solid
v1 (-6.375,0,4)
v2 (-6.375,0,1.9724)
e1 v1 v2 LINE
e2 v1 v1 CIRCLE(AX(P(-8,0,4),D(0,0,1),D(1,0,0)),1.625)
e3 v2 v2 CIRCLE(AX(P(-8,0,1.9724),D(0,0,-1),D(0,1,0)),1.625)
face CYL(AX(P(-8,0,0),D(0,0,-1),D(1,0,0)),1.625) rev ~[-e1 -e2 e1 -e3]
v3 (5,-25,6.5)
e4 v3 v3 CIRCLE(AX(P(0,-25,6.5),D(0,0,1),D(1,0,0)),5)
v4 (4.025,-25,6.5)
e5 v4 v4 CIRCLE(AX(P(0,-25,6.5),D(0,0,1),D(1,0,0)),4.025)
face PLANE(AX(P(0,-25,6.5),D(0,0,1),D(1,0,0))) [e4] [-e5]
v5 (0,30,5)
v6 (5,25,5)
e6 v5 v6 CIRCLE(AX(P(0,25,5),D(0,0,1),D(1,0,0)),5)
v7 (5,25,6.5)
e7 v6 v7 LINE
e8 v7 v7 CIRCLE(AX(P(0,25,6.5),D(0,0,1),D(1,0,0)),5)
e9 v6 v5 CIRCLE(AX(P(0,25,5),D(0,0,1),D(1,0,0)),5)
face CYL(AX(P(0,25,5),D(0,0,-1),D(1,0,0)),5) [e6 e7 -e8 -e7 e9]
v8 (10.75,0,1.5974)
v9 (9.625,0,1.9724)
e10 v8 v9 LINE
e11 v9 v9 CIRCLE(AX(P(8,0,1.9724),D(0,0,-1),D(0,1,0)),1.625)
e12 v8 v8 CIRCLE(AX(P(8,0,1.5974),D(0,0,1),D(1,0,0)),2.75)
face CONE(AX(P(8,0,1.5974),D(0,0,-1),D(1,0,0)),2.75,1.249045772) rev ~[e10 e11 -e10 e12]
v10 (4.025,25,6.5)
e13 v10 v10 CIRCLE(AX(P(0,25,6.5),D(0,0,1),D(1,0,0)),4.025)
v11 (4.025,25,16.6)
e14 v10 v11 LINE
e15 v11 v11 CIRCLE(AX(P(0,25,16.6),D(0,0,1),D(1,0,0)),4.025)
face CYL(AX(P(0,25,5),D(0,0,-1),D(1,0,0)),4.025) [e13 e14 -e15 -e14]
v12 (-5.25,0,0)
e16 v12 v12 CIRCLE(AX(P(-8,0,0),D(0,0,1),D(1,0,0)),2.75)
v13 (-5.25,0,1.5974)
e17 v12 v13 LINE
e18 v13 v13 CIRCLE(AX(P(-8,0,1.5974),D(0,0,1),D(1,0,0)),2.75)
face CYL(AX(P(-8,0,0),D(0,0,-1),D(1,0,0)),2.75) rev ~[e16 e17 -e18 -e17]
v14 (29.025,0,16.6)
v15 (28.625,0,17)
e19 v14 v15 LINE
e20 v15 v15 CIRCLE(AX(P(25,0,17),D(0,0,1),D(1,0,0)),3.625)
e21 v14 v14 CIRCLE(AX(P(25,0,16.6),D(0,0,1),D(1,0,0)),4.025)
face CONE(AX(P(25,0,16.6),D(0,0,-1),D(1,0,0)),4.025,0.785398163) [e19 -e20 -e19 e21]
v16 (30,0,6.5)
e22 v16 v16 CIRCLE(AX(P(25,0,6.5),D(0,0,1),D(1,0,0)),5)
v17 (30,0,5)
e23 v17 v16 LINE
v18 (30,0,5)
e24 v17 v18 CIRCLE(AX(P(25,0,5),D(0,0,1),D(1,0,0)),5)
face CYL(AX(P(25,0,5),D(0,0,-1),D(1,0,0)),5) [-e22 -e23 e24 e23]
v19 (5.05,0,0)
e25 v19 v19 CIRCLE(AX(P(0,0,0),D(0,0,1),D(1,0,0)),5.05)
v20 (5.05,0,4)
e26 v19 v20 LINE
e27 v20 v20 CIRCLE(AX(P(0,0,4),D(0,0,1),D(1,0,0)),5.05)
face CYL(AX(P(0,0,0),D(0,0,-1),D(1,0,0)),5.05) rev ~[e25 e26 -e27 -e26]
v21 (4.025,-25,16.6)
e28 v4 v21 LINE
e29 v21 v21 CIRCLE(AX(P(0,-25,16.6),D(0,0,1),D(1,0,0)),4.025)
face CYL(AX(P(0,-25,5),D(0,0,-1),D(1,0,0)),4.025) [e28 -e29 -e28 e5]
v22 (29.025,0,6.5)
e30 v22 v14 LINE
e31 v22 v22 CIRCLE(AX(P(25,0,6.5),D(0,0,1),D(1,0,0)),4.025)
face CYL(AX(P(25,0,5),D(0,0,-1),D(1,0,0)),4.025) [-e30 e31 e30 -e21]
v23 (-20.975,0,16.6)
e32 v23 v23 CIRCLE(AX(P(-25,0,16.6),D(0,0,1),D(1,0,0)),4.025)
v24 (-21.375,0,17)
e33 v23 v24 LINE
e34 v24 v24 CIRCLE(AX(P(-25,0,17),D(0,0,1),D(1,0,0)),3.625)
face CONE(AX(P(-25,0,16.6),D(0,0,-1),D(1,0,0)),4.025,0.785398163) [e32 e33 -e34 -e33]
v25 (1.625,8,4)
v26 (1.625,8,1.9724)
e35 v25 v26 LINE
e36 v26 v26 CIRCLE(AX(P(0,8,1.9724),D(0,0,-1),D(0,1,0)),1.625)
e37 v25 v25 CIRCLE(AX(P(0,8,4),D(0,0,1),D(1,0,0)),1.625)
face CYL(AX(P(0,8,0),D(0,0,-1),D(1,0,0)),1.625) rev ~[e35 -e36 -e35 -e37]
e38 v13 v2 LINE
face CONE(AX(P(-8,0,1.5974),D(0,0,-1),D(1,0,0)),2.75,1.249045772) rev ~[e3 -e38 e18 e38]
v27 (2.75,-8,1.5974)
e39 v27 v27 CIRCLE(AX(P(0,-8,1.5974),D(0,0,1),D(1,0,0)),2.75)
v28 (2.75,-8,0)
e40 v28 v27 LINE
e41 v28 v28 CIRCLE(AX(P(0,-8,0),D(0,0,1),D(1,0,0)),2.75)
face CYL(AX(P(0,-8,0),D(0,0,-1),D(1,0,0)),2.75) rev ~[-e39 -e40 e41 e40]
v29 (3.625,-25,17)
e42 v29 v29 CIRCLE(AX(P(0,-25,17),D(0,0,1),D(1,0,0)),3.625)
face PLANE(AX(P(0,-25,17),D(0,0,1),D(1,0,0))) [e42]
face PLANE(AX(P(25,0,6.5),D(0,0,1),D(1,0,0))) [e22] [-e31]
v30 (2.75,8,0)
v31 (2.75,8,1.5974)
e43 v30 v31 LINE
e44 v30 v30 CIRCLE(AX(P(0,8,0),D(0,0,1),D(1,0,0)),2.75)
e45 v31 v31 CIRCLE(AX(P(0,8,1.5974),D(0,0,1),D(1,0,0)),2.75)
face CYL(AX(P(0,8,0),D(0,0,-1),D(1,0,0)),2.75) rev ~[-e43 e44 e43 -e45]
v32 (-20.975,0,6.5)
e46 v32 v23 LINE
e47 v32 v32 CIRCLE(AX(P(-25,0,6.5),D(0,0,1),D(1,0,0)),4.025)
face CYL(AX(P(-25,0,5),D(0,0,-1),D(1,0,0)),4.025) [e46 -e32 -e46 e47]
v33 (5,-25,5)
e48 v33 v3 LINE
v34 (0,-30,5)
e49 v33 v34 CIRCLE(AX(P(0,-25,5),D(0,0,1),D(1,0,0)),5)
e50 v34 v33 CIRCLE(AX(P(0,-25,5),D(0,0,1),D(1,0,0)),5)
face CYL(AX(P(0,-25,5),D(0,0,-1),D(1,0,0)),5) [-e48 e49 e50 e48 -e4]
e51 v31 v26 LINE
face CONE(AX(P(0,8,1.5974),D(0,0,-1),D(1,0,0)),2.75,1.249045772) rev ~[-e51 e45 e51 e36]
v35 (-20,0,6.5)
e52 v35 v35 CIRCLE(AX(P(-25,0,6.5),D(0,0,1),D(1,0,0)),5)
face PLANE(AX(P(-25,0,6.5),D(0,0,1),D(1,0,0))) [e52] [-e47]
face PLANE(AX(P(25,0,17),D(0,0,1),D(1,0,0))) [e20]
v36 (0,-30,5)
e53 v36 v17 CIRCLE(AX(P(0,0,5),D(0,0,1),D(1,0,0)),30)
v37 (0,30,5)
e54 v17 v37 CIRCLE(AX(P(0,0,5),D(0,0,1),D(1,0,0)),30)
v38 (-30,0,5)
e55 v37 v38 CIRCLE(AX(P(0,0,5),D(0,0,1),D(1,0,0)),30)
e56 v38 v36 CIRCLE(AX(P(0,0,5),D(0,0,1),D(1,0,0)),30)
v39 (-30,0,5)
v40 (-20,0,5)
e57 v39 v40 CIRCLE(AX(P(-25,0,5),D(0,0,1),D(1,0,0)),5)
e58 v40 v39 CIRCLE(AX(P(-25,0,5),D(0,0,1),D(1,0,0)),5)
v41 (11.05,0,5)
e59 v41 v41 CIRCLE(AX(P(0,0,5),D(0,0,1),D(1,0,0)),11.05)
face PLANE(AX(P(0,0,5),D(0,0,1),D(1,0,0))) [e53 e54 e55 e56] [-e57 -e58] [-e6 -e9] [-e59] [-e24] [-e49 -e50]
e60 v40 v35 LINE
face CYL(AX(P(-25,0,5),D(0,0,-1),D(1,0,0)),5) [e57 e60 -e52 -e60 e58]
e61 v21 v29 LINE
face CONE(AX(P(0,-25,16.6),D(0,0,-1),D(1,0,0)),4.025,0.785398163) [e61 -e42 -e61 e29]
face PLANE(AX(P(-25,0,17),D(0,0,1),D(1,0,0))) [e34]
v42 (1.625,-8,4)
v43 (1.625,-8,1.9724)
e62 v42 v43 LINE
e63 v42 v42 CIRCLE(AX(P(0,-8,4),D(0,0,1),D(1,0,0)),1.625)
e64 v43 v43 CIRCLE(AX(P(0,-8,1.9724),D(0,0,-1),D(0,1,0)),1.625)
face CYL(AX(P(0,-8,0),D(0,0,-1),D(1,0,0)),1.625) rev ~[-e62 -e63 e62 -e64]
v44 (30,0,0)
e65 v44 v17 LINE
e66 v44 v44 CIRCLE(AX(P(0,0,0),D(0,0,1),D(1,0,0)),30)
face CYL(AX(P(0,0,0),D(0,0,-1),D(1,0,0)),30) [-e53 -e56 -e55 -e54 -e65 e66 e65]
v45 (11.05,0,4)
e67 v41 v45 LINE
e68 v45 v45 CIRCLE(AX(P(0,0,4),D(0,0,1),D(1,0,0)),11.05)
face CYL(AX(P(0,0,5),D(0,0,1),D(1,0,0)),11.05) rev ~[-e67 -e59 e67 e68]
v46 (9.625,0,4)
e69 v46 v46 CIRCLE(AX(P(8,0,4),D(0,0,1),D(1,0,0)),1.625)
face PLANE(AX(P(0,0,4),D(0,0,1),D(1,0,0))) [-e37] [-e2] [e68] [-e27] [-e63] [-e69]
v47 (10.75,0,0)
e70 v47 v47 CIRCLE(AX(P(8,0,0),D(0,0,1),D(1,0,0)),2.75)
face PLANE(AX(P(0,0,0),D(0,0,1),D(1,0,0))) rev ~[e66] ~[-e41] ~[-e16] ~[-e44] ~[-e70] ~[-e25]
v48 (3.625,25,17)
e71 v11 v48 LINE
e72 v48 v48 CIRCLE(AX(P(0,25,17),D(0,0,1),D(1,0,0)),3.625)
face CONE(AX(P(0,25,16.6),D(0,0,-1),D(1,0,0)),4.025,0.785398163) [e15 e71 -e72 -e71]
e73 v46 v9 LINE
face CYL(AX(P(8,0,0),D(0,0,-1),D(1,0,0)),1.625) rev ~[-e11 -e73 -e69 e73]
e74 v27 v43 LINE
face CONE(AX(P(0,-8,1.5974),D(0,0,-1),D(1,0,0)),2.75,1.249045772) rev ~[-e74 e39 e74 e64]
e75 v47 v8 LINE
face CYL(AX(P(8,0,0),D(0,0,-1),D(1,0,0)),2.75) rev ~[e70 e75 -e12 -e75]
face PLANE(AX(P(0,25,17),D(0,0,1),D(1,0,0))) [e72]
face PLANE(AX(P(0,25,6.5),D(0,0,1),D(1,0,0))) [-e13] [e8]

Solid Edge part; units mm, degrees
sketch "Sketch1" plane through (0, 0, 0) normal (0, 0, 1) x (1, 0, 0)
  circle A0 centre (8, 0) radius 1.625
  circle A1 centre (-8, 0) radius 1.625
  circle A2 centre (0, 0) radius 30
  circle A3 centre (0, 8) radius 1.625
  circle A4 centre (0, -8) radius 1.625
  circle A5 centre (0, 0) radius 5.05
  dimension "D1" = 8
  dimension "D2" = 8
  dimension "D3" = 8
  dimension "D4" = 8
extrude "Protrusion1" add sketch "Sketch1" along normal blind 5
sketch "Sketch2" plane through (0, 0, 5) normal (0, 0, 1) x (1, 0, 0)
  circle A0 centre (0, 0) radius 5.05
  circle A1 centre (0, 8) radius 1.625
  circle A2 centre (8, 0) radius 1.625
  circle A3 centre (0, -8) radius 1.625
  circle A4 centre (-8, 0) radius 1.625
  circle A5 centre (0, 0) radius 11.05
extrude "ExtrudedCutout_1" cut sketch "Sketch2" against normal blind 1
sketch "Sketch3" plane through (0, 0, 5) normal (0, 0, 1) x (1, 0, 0)
  circle A0 centre (-25, 0) radius 4.025
  circle A1 centre (0, 25) radius 4.025
  circle A2 centre (25, 0) radius 4.025
  circle A3 centre (0, -25) radius 4.025
  dimension "D1" = 25
  dimension "D2" = 25
  dimension "D3" = 25
  dimension "D4" = 25
extrude "ExtrudedProtrusion_2" add sketch "Sketch3" along normal blind 12
chamfer "Chamfer_2" distance 0.4 angle 45 4 edges at (-29.025, 0, 17) (-4.025, 25, 17) (-4.025, -25, 17) (20.975, 0, 17)
sketch "Sketch4" plane through (0, 0, 5) normal (0, 0, 1) x (1, 0, 0)
  circle A0 centre (25, 0) radius 5
  circle A1 centre (25, 0) radius 4.025
  circle A2 centre (0, 25) radius 5
  circle A3 centre (0, 25) radius 4.025
  circle A4 centre (0, -25) radius 5
  circle A5 centre (0, -25) radius 4.025
  circle A6 centre (-25, 0) radius 5
  circle A7 centre (-25, 0) radius 4.025
  dimension "D1" = 25
  dimension "D2" = 25
  dimension "D3" = 25
  dimension "D4" = 25
extrude "ExtrudedProtrusion_3" add sketch "Sketch4" along normal blind 1.5
sketch "Sketch5" plane through (0, 0, 0) normal (0, 0, 1) x (1, 0, 0)
  circle A0 centre (0, -8) radius 2.75
  circle A1 centre (0, -8) radius 1.625
  circle A2 centre (8, 0) radius 2.75
  circle A3 centre (8, 0) radius 1.625
  circle A4 centre (-8, 0) radius 2.75
  circle A5 centre (-8, 0) radius 1.625
  circle A6 centre (0, 8) radius 2.75
  circle A7 centre (0, 8) radius 1.625
  dimension "D1" = 8
  dimension "D2" = 8
  dimension "D3" = 8
  dimension "D4" = 8
extrude "Cutout1" cut sketch "Sketch5" along normal blind 2.0974
chamfer "Chamfer_3" distance 0.5 distance2 1.5 4 edges at (-10.75, 0, 2.0974) (-2.75, -8, 2.0974) (5.25, 0, 2.0974) (-2.75, 8, 2.0974) measured on face at (1.5218, -5.7095, 1.7269) measured on face at (-6.4782, 2.2905, 1.7269) measured on face at (9.5218, 2.2905, 1.7269) measured on face at (1.5218, 10.2905, 1.7269)
